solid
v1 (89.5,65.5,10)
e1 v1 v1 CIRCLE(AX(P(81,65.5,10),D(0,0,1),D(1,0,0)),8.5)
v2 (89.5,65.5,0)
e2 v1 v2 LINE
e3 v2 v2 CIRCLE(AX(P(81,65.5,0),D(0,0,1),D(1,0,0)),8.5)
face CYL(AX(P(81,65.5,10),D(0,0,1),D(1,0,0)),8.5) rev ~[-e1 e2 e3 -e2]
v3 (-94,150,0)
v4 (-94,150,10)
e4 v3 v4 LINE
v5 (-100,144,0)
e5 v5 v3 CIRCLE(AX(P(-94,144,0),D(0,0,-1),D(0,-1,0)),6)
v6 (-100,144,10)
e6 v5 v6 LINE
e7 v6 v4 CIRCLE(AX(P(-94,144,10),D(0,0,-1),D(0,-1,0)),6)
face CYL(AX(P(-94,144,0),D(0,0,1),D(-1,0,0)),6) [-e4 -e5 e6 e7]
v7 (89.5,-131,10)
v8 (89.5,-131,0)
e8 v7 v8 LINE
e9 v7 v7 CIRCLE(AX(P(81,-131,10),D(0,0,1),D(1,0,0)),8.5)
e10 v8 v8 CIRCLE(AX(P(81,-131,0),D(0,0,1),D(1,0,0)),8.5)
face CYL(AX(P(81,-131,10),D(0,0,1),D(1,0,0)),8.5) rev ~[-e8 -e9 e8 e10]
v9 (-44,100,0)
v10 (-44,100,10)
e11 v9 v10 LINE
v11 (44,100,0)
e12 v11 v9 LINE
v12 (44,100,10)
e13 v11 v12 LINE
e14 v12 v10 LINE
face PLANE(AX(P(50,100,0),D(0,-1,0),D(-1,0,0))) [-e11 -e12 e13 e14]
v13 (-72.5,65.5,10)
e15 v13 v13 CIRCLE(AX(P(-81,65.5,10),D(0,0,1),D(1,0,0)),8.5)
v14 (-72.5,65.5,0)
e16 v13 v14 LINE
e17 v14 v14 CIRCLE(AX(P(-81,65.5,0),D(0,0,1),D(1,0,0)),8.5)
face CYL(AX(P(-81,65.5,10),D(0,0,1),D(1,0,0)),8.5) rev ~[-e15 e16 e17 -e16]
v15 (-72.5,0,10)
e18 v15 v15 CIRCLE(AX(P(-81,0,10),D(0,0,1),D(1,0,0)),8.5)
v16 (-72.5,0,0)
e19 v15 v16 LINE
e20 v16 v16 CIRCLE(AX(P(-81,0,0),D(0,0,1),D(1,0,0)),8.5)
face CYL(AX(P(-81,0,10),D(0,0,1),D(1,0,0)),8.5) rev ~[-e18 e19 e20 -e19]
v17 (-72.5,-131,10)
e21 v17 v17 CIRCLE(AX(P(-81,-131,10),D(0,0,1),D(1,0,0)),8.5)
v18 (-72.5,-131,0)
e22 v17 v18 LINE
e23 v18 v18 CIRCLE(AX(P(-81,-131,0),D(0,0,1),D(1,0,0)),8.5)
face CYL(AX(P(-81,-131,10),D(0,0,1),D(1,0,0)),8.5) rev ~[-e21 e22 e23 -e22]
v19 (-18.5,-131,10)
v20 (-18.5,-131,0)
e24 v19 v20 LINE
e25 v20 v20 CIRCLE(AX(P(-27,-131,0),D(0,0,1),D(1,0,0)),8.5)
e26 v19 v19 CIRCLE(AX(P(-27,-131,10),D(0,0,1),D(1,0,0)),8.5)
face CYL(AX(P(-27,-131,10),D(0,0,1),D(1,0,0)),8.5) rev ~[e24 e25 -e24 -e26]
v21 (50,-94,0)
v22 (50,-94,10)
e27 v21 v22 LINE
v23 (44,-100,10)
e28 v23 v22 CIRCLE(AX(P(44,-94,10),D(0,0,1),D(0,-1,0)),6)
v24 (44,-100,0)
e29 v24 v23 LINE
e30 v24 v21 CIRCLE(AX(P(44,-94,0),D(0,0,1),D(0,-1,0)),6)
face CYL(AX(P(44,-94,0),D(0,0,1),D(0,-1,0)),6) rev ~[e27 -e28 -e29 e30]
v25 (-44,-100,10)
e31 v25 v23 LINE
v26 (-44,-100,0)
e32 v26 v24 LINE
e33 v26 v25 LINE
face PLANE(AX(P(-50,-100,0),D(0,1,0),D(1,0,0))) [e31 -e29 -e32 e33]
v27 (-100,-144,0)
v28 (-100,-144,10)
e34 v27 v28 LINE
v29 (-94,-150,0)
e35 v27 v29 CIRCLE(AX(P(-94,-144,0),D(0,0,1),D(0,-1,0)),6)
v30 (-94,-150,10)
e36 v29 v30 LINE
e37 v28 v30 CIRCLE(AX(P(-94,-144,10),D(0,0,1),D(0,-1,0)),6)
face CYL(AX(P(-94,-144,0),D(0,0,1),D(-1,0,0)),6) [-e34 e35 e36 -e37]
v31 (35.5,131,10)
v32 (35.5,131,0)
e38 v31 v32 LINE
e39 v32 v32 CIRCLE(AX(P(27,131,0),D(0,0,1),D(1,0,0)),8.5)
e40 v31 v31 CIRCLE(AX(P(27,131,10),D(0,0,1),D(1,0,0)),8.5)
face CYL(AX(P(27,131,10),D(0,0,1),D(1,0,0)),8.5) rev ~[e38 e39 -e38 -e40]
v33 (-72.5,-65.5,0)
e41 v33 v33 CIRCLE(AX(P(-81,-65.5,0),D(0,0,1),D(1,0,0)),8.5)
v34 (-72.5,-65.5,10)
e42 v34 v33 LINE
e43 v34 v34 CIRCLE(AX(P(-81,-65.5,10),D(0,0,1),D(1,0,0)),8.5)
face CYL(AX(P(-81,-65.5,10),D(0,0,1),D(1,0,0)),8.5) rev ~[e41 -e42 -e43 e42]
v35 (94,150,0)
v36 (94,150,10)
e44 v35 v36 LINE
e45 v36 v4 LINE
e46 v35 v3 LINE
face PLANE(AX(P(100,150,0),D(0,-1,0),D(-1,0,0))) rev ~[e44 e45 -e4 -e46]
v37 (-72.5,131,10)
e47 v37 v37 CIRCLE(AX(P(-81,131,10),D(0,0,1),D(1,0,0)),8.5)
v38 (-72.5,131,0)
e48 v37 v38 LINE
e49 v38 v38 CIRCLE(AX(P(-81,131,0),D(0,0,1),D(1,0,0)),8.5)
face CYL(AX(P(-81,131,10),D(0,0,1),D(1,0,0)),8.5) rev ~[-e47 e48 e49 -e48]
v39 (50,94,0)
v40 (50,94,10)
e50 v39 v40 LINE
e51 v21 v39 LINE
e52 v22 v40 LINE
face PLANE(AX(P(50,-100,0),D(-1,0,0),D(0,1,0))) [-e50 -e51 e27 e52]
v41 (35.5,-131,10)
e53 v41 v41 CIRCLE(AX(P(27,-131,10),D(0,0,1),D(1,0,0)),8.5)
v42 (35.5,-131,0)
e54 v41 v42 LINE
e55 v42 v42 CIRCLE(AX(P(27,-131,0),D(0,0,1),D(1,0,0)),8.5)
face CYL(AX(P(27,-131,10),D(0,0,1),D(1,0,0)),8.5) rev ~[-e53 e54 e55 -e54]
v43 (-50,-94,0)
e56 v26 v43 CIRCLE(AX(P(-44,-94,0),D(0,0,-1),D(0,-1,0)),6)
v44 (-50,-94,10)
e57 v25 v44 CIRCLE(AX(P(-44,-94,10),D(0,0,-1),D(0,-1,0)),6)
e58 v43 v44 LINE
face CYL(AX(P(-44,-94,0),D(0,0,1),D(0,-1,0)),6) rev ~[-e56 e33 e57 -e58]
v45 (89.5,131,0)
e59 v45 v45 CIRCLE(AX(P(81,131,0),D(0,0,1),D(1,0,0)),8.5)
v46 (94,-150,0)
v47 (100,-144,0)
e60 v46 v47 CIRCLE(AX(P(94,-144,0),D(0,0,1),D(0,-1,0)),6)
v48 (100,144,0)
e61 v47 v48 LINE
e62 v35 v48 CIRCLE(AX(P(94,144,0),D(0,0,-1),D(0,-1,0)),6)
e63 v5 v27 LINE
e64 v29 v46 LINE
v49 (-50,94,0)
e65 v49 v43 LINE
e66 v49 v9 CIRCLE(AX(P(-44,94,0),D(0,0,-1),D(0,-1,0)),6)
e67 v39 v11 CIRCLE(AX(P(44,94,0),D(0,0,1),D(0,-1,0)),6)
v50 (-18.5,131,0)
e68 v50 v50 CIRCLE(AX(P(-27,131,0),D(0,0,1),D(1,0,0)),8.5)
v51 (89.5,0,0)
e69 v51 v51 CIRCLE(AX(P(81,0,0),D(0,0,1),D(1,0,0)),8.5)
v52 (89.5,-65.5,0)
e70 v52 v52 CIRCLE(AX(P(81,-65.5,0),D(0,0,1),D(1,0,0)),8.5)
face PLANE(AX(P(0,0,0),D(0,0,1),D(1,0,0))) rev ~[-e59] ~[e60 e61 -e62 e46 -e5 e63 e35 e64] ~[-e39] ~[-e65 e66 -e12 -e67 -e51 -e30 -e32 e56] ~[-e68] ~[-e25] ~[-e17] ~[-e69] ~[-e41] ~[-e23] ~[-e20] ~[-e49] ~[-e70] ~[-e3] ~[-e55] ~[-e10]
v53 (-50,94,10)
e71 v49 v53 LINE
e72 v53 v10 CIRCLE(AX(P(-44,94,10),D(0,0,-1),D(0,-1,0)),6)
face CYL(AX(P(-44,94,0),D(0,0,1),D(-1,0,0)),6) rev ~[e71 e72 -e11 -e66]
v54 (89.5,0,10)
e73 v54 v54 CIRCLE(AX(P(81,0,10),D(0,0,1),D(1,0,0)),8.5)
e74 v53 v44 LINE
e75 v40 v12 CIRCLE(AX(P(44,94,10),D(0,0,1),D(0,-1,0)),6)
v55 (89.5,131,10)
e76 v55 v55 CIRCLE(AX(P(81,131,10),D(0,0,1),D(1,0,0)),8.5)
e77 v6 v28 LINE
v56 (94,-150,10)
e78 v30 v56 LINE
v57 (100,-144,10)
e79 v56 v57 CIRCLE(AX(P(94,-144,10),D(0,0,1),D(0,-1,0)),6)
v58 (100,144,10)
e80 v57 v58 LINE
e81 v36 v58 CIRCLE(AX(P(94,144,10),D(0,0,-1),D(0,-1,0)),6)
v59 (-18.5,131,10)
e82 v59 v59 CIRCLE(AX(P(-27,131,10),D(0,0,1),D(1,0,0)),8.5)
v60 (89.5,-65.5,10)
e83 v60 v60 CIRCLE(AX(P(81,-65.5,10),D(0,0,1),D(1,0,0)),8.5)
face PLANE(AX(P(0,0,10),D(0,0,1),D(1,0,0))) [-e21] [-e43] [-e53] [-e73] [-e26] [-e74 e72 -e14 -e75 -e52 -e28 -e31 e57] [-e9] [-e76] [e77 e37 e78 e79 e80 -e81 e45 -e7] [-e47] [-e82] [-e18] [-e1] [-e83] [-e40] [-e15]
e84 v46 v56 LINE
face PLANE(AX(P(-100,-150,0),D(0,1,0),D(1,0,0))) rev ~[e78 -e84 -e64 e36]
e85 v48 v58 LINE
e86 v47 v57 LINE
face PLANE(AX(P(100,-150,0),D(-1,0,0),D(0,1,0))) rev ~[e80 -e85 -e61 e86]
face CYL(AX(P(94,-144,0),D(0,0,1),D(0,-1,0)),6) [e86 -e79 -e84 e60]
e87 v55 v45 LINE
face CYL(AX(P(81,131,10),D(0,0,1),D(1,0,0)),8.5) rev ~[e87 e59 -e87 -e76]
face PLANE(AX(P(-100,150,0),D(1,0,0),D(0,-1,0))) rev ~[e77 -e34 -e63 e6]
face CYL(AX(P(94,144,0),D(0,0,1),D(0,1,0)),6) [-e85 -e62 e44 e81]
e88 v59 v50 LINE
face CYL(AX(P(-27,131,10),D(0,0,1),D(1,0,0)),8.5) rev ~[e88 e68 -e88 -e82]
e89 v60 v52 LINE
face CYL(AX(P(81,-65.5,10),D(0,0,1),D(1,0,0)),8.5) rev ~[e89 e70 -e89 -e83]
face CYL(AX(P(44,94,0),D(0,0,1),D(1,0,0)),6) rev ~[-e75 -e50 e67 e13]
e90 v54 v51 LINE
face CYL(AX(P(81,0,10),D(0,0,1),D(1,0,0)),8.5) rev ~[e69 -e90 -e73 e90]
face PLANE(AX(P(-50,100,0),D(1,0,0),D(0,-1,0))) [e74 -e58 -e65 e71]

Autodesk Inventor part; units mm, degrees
ref_plane "YZ Plane" through (0, 0, 0) normal (1, 0, 0) x (0, 1, 0)
ref_plane "XZ Plane" through (0, 0, 0) normal (0, 1, 0) x (-1, 0, 0)
ref_plane "XY Plane" through (0, 0, 0) normal (0, 0, 1) x (1, 0, 0)
sketch "Sketch2" plane through (0, 0, 0) normal (0, 0, 1) x (1, 0, 0)
  line L0 (-50, -100) -> (50, -100)
  line L1 (50, -100) -> (50, 100)
  line L2 (50, 100) -> (-50, 100)
  line L3 (-50, 100) -> (-50, -100)
  line L4 (-50, -100) -> (50, 100) construction
  line L5 (50, -100) -> (-50, 100) construction
  line L6 (-100, -150) -> (100, -150)
  line L7 (100, -150) -> (100, 150)
  line L8 (100, 150) -> (-100, 150)
  line L9 (-100, 150) -> (-100, -150)
  point P0 (0, 0)
  dimension "d29" = 100
  dimension "d30" = 200
  dimension "d31" = 50
extrude "Plate2" add sketch "Sketch2" along normal blind 10
sketch "Sketch5" plane through (0, 0, 10) normal (0, 0, 1) x (1, 0, 0)
  line L0 (50, 100) -> (50, -100) construction
  line L1 (50, -100) -> (-50, -100) construction
  line L2 (-50, -100) -> (-50, 100) construction
  line L3 (-50, 100) -> (50, 100) construction
  line L4 (100, -150) -> (-100, -150) construction
  line L5 (100, 150) -> (100, -150) construction
  line L6 (-100, 150) -> (100, 150) construction
  line L7 (-100, -150) -> (-100, 150) construction
  line L8 (-81, 131) -> (81, 131) construction
  line L9 (81, 131) -> (81, -131) construction
  line L10 (81, -131) -> (-81, -131) construction
  line L11 (-81, -131) -> (-81, 131) construction
  circle A0 centre (-81, -131) radius 8.5
  circle A1 centre (-81, 131) radius 8.5
  circle A2 centre (-81, 0) radius 8.5
  circle A3 centre (-81, -65.5) radius 8.5
  circle A4 centre (-81, 65.5) radius 8.5
  line L12 (-50, 0) -> (50, 0) construction
  circle A5 centre (-27, -131) radius 8.5
  circle A6 centre (-27, -65.5) radius 8.5
  circle A7 centre (-27, 0) radius 8.5
  circle A8 centre (-27, 65.5) radius 8.5
  circle A9 centre (-27, 131) radius 8.5
  circle A10 centre (27, -131) radius 8.5
  circle A11 centre (27, -65.5) radius 8.5
  circle A12 centre (27, 0) radius 8.5
  circle A13 centre (27, 65.5) radius 8.5
  circle A14 centre (27, 131) radius 8.5
  circle A15 centre (81, -131) radius 8.5
  circle A16 centre (81, -65.5) radius 8.5
  circle A17 centre (81, 0) radius 8.5
  circle A18 centre (81, 65.5) radius 8.5
  circle A19 centre (81, 131) radius 8.5
  point P0 (0, 0)
  point P1 (0, -131)
  dimension "d33" = 17
  dimension "d34" = 19
  dimension "d35" = 65.5
  dimension "d36" = 65.5
  dimension "d39" = 54
extrude "Cut3" cut sketch "Sketch5" against normal blind 10
fillet "Corner Round1" radius 6 8 edges at (-100, -150, 5) (-100, 150, 5) (100, 150, 5) (100, -150, 5) (50, -100, 5) (-50, -100, 5) (-50, 100, 5) (50, 100, 5)
equation "\"d35\" = d36"
equation "\"d44\" = Thickness"
equation "\"d14\" = Thickness"
equation "\"BendReliefDepth\" = 0.5 * Thickness"
equation "\"TransitionRadius\" = BendRadius"
equation "\"JacobiRadiusSize\" = BendRadius"
equation "\"Thickness\" = 10"
equation "\"BendRadius\" = 6"
properties part number "PRS 1706 charging flange round_D940" material "Steel"
